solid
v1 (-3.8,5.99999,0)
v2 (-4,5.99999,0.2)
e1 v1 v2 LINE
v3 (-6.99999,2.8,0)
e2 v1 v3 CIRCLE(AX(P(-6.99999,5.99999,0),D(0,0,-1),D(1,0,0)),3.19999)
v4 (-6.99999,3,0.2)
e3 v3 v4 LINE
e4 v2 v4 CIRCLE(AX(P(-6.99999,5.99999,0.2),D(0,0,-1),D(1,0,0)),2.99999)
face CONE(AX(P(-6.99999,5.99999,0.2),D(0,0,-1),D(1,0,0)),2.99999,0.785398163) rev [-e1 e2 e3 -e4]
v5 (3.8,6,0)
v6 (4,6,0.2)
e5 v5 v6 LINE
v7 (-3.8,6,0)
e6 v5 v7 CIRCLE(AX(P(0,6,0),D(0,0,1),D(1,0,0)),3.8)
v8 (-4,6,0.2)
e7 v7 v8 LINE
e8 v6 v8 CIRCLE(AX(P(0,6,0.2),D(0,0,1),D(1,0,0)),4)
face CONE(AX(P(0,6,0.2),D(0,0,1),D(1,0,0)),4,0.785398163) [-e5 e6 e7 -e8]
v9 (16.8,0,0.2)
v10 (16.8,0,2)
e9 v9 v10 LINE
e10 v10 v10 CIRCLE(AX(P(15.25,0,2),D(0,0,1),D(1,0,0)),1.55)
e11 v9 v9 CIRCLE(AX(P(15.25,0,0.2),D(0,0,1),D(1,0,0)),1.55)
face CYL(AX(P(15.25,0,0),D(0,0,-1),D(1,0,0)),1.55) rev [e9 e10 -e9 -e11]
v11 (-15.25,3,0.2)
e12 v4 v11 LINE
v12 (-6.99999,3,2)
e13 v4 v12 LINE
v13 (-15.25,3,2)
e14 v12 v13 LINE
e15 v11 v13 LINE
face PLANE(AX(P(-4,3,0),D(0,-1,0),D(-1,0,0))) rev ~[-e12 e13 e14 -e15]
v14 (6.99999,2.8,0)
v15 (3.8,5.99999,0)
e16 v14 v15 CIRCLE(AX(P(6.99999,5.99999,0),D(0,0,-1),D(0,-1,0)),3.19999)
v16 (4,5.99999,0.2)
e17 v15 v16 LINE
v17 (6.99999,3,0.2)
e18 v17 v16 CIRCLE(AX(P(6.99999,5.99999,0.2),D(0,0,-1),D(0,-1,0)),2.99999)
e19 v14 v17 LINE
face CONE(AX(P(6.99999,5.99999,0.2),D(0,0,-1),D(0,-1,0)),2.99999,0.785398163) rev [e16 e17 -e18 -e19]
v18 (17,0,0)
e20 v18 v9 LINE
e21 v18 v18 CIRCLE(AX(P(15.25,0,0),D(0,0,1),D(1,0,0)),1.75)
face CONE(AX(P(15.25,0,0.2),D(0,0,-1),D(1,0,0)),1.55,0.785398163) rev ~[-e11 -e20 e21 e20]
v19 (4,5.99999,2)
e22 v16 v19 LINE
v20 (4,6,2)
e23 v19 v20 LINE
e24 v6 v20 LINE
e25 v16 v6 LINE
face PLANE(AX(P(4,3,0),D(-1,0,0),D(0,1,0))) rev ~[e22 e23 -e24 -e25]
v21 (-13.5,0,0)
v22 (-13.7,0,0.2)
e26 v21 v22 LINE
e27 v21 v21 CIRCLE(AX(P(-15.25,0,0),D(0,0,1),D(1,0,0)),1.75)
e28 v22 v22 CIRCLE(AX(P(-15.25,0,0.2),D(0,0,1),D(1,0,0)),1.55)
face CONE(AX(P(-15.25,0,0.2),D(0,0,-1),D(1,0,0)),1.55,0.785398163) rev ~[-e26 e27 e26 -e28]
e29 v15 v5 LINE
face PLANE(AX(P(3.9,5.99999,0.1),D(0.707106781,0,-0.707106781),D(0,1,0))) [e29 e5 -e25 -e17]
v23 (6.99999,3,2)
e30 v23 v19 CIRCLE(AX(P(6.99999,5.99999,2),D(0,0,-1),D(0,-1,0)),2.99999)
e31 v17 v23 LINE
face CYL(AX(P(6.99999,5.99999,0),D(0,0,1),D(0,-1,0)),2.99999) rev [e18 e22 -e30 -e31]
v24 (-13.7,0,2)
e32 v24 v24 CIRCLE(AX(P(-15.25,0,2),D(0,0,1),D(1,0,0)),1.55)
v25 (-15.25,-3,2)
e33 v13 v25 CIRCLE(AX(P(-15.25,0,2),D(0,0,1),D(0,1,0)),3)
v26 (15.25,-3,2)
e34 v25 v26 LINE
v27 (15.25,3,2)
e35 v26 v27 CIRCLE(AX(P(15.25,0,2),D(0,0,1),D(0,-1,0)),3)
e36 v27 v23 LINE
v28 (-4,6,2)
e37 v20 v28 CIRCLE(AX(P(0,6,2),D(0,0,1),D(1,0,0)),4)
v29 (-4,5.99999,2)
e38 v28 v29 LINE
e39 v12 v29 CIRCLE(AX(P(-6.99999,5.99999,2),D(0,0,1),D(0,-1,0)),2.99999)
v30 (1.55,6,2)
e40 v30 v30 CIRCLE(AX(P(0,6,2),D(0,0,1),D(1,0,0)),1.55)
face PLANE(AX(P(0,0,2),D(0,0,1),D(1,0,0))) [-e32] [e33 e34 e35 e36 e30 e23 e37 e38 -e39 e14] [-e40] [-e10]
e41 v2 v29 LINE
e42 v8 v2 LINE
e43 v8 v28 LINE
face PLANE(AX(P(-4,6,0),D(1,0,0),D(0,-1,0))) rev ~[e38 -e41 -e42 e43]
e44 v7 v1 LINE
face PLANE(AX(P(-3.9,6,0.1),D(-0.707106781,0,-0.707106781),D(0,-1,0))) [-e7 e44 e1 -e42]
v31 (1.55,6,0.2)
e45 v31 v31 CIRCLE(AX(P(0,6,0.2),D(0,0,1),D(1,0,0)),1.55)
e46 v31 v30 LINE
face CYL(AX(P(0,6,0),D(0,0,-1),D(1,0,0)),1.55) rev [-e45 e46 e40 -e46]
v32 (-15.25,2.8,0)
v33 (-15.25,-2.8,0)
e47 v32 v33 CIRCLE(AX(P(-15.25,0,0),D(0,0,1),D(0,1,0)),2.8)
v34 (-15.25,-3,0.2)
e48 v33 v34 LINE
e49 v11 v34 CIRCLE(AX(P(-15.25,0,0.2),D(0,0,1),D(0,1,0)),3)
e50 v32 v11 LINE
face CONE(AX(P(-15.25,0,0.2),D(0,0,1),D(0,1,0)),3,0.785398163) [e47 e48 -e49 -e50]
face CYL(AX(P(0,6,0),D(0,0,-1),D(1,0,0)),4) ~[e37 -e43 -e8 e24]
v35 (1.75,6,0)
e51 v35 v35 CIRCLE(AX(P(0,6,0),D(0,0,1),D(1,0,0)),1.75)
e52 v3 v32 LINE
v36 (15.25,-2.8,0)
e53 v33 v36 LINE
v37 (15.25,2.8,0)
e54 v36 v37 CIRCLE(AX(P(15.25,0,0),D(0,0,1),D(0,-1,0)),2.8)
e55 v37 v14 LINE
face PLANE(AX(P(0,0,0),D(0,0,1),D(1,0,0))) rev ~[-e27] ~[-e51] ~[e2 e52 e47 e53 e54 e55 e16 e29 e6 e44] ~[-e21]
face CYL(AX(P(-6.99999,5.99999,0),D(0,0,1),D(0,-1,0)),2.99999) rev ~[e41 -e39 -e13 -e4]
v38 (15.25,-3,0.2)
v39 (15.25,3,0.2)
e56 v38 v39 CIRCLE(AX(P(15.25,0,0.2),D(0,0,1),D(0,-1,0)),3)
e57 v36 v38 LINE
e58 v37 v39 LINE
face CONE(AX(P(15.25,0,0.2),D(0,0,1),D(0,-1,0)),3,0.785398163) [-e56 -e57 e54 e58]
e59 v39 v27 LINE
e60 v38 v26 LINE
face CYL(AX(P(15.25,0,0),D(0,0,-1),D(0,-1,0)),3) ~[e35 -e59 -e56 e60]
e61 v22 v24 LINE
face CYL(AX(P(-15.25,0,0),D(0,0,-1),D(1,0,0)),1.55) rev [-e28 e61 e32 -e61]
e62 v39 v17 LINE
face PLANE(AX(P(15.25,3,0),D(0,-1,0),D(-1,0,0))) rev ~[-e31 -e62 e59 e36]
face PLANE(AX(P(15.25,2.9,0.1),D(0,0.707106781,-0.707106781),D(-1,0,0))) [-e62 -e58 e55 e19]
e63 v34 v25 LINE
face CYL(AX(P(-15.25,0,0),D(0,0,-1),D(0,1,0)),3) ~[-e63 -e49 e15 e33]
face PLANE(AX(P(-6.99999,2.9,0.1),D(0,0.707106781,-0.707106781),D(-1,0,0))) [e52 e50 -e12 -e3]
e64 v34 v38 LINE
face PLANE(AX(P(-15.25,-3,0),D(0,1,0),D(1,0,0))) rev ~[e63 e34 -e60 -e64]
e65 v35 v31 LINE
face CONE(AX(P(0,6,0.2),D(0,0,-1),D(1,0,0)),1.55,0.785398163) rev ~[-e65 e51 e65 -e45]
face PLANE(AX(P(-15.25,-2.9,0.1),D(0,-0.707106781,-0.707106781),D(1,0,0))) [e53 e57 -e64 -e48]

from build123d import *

# Parameters (mm, degrees)
F0_R     = 1.55
F1_DEPTH = 2
F2_R     = 2.99999
F3_SIZE  = 0.2


# Not quite as in the source:
# - a fillet or chamfer is up to 0.001 mm smaller than in the source, because OpenCascade refuses the exact size


with BuildPart() as f1:
    # F0 (on Top) → F1 (new body)
    with BuildSketch(Plane.XY):
        with BuildLine():
            ThreePointArc((-15.25, 3), (-18.25, 0), (-15.25, -3))
            Line((-15.25, -3), (15.25, -3))
            ThreePointArc((15.25, -3), (18.25, 0), (15.25, 3))
            Line((15.25, 3), (4, 3))
            Line((4, 3), (-4, 3))
            Line((-4, 3), (-15.25, 3))
        make_face()
        with Locations((-15.25, 0)):
            Circle(F0_R, mode=Mode.SUBTRACT)
        with Locations((15.25, 0)):
            Circle(F0_R, mode=Mode.SUBTRACT)
        with BuildLine():
            Line((-4, 6), (-4, 3))
            Line((-4, 3), (4, 3))
            Line((4, 3), (4, 6))
            ThreePointArc((4, 6), (0, 10), (-4, 6))
        make_face()
        with Locations((0, 6)):
            Circle(F0_R, mode=Mode.SUBTRACT)
    extrude(amount=F1_DEPTH)

    # F2 (radius 3 in the source; OpenCascade refuses exactly that, so slightly less here)
    f2_edges = [f1.edges().sort_by_distance(p)[0] for p in [
        (4, 3, 1),
        (-4, 3, 1),
    ]]
    fillet(f2_edges, radius=F2_R)

    # F3
    f3_edges = [f1.edges().sort_by_distance(p)[0] for p in [
        (11.124995, 3, 0),
        (4.878677, 3.878677, 0),
        (18.25, 0, 0),
        (4, 5.999995, 0),
        (0, -3, 0),
        (0, 10, 0),
        (-18.25, 0, 0),
        (-4, 5.999995, 0),
        (-11.124995, 3, 0),
        (-4.878677, 3.878677, 0),
        (-16.8, 0, 0),
        (13.7, 0, 0),
        (-1.55, 6, 0),
    ]]
    chamfer(f3_edges, length=F3_SIZE)


solid = f1.part
